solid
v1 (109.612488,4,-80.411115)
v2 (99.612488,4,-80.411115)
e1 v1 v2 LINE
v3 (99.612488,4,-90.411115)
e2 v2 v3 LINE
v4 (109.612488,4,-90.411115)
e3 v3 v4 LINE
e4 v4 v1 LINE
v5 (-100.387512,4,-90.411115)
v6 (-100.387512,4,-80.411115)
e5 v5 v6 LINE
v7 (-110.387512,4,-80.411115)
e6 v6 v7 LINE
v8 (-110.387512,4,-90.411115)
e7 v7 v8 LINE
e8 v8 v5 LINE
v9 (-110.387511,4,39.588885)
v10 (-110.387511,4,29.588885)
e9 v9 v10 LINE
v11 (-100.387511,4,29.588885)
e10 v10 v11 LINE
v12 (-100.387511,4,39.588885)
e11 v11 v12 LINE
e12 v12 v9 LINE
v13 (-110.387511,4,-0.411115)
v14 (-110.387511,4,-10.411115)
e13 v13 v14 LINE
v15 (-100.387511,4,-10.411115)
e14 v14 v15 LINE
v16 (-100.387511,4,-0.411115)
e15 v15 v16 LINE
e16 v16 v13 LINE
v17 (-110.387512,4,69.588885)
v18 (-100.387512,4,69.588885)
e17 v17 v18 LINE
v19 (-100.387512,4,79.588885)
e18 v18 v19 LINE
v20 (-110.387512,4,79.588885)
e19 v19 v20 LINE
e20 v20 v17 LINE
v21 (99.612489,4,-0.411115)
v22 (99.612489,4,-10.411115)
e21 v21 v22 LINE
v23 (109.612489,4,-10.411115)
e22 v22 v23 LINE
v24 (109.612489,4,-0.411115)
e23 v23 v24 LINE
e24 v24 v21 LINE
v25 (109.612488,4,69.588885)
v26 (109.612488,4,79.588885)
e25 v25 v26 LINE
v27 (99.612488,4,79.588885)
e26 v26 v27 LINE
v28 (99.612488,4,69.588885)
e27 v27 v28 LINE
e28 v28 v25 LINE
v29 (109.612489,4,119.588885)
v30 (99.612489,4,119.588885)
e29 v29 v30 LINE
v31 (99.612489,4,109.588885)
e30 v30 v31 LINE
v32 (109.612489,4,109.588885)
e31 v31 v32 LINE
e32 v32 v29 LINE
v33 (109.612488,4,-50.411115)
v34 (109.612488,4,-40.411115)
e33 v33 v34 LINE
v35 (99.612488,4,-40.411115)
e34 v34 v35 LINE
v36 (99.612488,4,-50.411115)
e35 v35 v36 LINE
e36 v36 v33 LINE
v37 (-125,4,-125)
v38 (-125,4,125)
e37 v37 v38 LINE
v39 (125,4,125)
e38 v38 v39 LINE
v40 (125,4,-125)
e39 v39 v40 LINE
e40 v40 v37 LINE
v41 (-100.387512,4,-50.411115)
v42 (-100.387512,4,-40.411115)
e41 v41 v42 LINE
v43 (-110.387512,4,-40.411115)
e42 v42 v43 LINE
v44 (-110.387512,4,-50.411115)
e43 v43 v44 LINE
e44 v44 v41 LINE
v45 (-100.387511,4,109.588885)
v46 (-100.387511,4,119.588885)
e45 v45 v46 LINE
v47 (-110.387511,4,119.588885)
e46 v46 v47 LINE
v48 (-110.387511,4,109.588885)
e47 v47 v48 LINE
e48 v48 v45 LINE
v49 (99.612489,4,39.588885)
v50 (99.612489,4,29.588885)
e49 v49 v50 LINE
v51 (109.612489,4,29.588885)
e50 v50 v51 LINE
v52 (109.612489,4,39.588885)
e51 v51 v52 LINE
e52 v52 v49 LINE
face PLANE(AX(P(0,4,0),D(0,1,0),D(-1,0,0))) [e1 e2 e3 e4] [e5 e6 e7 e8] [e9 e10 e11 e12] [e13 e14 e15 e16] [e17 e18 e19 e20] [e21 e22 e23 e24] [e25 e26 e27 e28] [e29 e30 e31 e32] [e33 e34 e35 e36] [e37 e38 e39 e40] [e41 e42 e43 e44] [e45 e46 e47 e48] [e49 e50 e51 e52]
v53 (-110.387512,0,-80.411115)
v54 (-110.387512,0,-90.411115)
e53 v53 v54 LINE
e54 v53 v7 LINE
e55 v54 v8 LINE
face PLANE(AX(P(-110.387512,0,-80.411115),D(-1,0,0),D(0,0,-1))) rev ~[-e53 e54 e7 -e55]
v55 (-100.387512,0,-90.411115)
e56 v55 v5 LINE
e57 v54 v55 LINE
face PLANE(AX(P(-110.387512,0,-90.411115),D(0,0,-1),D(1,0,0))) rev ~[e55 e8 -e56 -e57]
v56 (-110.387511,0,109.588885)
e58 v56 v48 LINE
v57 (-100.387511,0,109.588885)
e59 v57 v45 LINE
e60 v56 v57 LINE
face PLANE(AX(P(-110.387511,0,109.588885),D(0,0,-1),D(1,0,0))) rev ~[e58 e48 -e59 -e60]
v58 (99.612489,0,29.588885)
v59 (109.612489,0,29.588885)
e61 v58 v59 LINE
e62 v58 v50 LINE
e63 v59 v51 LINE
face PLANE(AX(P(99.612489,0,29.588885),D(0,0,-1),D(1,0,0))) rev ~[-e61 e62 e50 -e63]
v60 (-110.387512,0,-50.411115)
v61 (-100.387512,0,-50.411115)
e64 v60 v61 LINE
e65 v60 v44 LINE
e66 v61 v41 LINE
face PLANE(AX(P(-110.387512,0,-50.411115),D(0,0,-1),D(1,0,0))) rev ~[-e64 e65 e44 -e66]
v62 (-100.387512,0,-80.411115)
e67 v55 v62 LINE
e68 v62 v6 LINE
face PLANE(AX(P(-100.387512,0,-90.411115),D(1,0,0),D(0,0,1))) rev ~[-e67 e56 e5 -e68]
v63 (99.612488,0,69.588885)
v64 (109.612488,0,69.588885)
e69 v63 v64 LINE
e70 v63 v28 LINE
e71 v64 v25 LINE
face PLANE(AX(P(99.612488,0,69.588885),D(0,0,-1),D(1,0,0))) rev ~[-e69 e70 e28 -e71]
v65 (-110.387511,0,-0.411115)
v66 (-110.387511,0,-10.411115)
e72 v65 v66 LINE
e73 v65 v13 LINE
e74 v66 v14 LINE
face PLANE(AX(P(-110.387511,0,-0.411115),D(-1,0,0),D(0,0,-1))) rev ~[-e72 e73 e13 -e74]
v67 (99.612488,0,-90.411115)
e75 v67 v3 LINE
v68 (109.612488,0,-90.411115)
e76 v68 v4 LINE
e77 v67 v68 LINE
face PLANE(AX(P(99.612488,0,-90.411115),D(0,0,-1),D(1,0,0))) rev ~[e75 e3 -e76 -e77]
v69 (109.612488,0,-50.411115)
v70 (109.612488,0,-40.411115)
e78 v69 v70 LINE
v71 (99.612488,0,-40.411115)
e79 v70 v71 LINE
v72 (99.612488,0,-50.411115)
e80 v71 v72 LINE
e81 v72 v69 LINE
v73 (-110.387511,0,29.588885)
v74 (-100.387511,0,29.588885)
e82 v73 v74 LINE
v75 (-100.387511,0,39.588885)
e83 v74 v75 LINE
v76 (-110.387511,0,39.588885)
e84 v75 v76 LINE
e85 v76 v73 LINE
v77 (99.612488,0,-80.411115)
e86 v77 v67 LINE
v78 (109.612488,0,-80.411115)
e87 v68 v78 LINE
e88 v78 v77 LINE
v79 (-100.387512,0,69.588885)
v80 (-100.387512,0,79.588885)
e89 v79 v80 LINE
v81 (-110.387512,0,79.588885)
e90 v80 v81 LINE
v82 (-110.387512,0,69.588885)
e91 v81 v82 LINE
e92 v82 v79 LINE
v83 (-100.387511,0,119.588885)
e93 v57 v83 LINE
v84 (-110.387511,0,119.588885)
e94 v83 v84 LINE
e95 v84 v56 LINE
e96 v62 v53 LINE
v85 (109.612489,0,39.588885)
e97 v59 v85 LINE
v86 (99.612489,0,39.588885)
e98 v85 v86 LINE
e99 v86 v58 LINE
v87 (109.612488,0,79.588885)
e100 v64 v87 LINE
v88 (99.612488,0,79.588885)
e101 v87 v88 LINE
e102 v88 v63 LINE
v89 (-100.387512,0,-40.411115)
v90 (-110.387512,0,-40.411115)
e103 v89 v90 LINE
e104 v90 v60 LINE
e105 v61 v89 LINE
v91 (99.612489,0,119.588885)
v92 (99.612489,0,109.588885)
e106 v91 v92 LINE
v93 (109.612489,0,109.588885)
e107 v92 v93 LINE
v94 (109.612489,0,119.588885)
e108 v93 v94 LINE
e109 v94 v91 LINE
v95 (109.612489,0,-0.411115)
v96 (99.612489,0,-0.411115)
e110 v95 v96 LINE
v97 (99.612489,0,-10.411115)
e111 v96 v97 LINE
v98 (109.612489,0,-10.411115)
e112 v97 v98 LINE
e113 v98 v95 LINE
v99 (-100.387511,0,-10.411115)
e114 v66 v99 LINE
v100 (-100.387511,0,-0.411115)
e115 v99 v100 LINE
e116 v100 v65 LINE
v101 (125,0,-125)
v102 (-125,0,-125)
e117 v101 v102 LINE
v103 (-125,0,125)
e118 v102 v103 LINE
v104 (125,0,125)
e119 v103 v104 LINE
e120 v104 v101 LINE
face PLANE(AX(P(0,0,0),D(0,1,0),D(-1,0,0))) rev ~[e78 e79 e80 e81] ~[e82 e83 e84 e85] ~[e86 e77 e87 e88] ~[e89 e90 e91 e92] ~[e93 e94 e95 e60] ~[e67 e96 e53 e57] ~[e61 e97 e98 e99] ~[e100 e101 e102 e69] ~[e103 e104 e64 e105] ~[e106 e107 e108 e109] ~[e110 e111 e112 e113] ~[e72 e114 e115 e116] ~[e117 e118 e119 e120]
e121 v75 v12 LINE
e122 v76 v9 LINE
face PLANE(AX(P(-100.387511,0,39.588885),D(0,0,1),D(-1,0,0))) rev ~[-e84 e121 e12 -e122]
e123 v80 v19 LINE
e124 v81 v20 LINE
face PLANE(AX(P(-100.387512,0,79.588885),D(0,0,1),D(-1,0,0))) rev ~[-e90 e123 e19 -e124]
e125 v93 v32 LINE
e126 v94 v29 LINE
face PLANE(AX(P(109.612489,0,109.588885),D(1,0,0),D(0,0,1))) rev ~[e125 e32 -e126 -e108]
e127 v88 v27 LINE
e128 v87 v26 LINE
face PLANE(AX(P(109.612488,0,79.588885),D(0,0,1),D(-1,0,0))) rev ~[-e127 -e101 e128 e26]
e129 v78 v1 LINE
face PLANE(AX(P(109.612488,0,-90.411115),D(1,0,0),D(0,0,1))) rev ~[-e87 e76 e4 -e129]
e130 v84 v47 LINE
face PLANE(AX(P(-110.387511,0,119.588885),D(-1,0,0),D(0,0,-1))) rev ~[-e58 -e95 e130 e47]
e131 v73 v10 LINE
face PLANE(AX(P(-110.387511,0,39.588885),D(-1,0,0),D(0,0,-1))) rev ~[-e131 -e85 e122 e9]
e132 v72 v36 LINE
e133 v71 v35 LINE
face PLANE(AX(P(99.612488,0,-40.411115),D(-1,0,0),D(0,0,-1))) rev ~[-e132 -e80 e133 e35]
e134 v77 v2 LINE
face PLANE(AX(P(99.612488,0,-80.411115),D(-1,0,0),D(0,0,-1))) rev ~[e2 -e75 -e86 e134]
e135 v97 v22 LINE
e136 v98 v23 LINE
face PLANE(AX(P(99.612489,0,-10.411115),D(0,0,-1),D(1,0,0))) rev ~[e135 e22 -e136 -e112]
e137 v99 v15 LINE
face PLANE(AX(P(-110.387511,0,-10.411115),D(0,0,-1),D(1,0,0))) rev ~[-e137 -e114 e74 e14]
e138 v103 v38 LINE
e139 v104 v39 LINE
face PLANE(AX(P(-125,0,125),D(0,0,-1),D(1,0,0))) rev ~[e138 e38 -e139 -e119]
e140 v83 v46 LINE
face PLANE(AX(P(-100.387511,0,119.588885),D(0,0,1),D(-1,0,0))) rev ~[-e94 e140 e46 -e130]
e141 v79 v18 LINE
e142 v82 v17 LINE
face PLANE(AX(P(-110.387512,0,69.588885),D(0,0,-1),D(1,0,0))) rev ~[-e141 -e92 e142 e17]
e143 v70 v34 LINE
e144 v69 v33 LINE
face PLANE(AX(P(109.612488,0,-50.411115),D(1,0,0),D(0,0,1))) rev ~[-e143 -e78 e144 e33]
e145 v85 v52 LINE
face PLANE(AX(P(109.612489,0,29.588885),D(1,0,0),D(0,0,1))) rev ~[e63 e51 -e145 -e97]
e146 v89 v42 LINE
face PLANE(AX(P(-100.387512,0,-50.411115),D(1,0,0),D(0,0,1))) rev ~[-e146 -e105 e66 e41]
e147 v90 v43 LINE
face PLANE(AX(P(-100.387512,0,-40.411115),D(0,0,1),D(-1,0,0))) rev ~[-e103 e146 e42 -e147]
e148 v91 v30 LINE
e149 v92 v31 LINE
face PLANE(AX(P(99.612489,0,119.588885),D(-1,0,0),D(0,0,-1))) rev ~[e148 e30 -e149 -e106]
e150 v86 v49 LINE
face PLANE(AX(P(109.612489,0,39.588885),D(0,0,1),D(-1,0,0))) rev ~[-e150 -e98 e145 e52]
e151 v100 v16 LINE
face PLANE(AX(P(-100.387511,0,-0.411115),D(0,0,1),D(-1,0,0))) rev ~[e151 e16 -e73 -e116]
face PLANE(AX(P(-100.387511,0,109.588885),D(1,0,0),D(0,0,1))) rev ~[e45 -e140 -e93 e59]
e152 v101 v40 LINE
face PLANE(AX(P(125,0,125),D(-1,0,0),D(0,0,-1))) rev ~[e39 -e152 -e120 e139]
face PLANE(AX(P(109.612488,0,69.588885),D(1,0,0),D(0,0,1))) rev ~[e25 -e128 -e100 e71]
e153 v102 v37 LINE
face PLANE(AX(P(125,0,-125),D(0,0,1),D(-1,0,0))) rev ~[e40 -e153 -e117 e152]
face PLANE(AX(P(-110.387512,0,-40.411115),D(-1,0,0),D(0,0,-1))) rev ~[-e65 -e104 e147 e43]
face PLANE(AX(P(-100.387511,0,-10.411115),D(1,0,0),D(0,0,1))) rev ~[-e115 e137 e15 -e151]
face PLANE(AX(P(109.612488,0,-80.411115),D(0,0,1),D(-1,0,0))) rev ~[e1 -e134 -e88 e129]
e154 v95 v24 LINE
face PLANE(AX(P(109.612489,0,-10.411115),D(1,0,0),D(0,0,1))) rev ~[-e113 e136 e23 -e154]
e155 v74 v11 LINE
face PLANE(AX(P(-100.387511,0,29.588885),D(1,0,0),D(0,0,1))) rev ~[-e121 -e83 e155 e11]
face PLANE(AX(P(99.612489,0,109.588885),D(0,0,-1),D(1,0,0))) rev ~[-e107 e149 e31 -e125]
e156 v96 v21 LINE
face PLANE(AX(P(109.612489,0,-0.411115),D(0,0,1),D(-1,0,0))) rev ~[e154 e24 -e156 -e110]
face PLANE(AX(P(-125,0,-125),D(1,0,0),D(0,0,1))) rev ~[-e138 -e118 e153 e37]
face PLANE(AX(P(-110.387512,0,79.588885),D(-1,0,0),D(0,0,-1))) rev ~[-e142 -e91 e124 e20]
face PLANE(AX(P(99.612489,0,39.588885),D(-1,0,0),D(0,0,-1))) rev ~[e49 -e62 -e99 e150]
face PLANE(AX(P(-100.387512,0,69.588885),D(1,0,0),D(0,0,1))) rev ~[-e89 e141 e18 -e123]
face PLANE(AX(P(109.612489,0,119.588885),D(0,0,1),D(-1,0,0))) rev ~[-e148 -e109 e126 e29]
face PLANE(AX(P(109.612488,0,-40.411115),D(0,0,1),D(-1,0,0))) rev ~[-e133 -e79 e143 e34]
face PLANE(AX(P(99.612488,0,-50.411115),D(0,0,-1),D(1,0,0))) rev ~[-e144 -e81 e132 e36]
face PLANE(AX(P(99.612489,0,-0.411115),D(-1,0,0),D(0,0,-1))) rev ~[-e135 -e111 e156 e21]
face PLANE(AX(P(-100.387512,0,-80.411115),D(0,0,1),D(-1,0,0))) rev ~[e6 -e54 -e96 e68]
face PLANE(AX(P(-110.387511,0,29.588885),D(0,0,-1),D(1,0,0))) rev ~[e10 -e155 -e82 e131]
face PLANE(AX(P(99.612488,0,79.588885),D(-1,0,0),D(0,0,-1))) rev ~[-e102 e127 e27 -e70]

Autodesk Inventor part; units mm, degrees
ref_plane "YZ Plane" through (0, 0, 0) normal (1, 0, 0) x (0, 1, 0)
ref_plane "XZ Plane" through (0, 0, 0) normal (0, 1, 0) x (-1, 0, 0)
ref_plane "XY Plane" through (0, 0, 0) normal (0, 0, 1) x (1, 0, 0)
sketch "Эскиз1" plane through (0, 0, 0) normal (0, 1, 0) x (-1, 0, 0)
  line L0 (125, 125) -> (-125, 125)
  line L1 (-125, 125) -> (-125, -125)
  line L2 (-125, -125) -> (125, -125)
  line L3 (125, -125) -> (125, 125)
  line L4 (125, 125) -> (-125, -125) construction
  line L5 (-125, 125) -> (125, -125) construction
  point P0 (0, 0)
  dimension "d0" = 250
  dimension "d1" = 250
extrude "Выдавливание1" add sketch "Эскиз1" along normal blind 4
sketch "Эскиз2" plane through (0, 0, 0) normal (0, -1, 0) x (1, 0, 0)
  line L0 (-110.387511, 109.588885) -> (-110.387511, 119.588885)
  line L1 (-100.387511, 109.588885) -> (-110.387511, 109.588885)
  line L2 (-100.387511, 119.588885) -> (-100.387511, 109.588885)
  line L3 (-110.387511, 119.588885) -> (-100.387511, 119.588885)
  line L4 (-110.387511, 29.588885) -> (-110.387511, 39.588885)
  line L5 (-100.387511, 29.588885) -> (-110.387511, 29.588885)
  line L6 (-100.387511, 39.588885) -> (-100.387511, 29.588885)
  line L7 (-110.387511, 39.588885) -> (-100.387511, 39.588885)
  line L8 (-110.387511, -10.411115) -> (-110.387511, -0.411115)
  line L9 (-100.387511, -10.411115) -> (-110.387511, -10.411115)
  line L10 (-100.387511, -0.411115) -> (-100.387511, -10.411115)
  line L11 (-110.387511, -0.411115) -> (-100.387511, -0.411115)
  line L12 (125, 125) -> (125, -125)
  line L13 (-125, 125) -> (125, 125)
  line L14 (-125, -125) -> (-125, 125)
  line L15 (125, -125) -> (-125, -125)
  line L16 (109.612489, 109.588885) -> (109.612489, 119.588885)
  line L17 (109.612489, 119.588885) -> (99.612489, 119.588885)
  line L18 (99.612489, 119.588885) -> (99.612489, 109.588885)
  line L19 (99.612489, 109.588885) -> (109.612489, 109.588885)
  line L20 (109.612489, 29.588885) -> (109.612489, 39.588885)
  line L21 (109.612489, 39.588885) -> (99.612489, 39.588885)
  line L22 (99.612489, 39.588885) -> (99.612489, 29.588885)
  line L23 (99.612489, 29.588885) -> (109.612489, 29.588885)
  line L24 (109.612489, -10.411115) -> (109.612489, -0.411115)
  line L25 (109.612489, -0.411115) -> (99.612489, -0.411115)
  line L26 (99.612489, -0.411115) -> (99.612489, -10.411115)
  line L27 (99.612489, -10.411115) -> (109.612489, -10.411115)
  line L28 (109.612488, -50.411115) -> (109.612488, -40.411115)
  line L29 (109.612488, -40.411115) -> (99.612488, -40.411115)
  line L30 (99.612488, -40.411115) -> (99.612488, -50.411115)
  line L31 (99.612488, -50.411115) -> (109.612488, -50.411115)
  line L32 (109.612488, -90.411115) -> (109.612488, -80.411115)
  line L33 (109.612488, -80.411115) -> (99.612488, -80.411115)
  line L34 (99.612488, -80.411115) -> (99.612488, -90.411115)
  line L35 (99.612488, -90.411115) -> (109.612488, -90.411115)
  line L36 (-100.387512, -80.411115) -> (-100.387512, -90.411115)
  line L37 (-110.387512, -81.025031) -> (-100.387512, -81.025031)
  line L38 (-110.387512, -90.411115) -> (-110.387512, -80.411115)
  line L39 (-100.387512, -110) -> (-110.387512, -110)
  line L40 (-100.387512, -40.411115) -> (-100.387512, -50.411115)
  line L41 (-100.387512, -50.411115) -> (-110.387512, -50.411115)
  line L42 (-110.387512, -50.411115) -> (-110.387512, -40.411115)
  line L43 (-110.387512, -40.411115) -> (-100.387512, -40.411115)
  line L44 (-100.387512, 74.588885) -> (-100.387512, 69.588885)
  line L45 (-100.387512, 79.588885) -> (-100.387512, 74.588885)
  line L46 (-110.387512, 79.588885) -> (-100.387512, 79.588885)
  line L47 (-110.387512, 74.588885) -> (-110.387512, 79.588885)
  line L48 (-110.387512, 69.588885) -> (-110.387512, 74.588885)
  line L49 (-100.387512, 69.588885) -> (-110.387512, 69.588885)
  line L50 (109.612488, 79.588885) -> (99.612488, 79.588885)
  line L51 (99.612488, 69.588885) -> (109.612488, 69.588885)
  line L52 (99.612488, 74.588885) -> (99.612488, 69.588885)
  line L53 (109.612488, 69.588885) -> (109.612488, 74.588885)
  line L54 (109.612488, 74.588885) -> (109.612488, 79.588885)
  line L55 (99.612488, 79.588885) -> (99.612488, 74.588885)
  circle A0 centre (104.612488, -65.411115) radius 2
  circle A1 centre (104.612488, -25.411115) radius 2
  circle A2 centre (104.612488, 14.588885) radius 2
  circle A3 centre (104.612488, 54.588885) radius 2
  circle A4 centre (104.612488, 94.588885) radius 2
  circle A5 centre (-105.387512, 94.588885) radius 2
  circle A6 centre (-105.387512, 54.588885) radius 2
  circle A7 centre (-105.387512, 14.588885) radius 2
  circle A8 centre (-105.387512, -25.411115) radius 2
  circle A9 centre (-105.387512, -65.411115) radius 2
  point P0 (0, 0)
sketch "Эскиз2 outline for Выдавливание2" plane through (0, 0, 0) normal (0, -1, 0) x (1, 0, 0)
  line L0 (-110.387511, -10.411115) -> (-100.387511, -10.411115)
  line L1 (-110.387511, -0.411115) -> (-110.387511, -10.411115)
  line L2 (-100.387511, -0.411115) -> (-110.387511, -0.411115)
  line L3 (-100.387511, -10.411115) -> (-100.387511, -0.411115)
  line L4 (-110.387511, 29.588885) -> (-100.387511, 29.588885)
  line L5 (-110.387511, 39.588885) -> (-110.387511, 29.588885)
  line L6 (-100.387511, 39.588885) -> (-110.387511, 39.588885)
  line L7 (-100.387511, 29.588885) -> (-100.387511, 39.588885)
  line L8 (-110.387511, 109.588885) -> (-100.387511, 109.588885)
  line L9 (-110.387511, 119.588885) -> (-110.387511, 109.588885)
  line L10 (-100.387511, 119.588885) -> (-110.387511, 119.588885)
  line L11 (-100.387511, 109.588885) -> (-100.387511, 119.588885)
  line L12 (109.612488, -90.411115) -> (109.612488, -80.411115)
  line L13 (99.612488, -90.411115) -> (109.612488, -90.411115)
  line L14 (99.612488, -80.411115) -> (99.612488, -90.411115)
  line L15 (109.612488, -80.411115) -> (99.612488, -80.411115)
  line L16 (109.612488, -50.411115) -> (109.612488, -40.411115)
  line L17 (99.612488, -50.411115) -> (109.612488, -50.411115)
  line L18 (99.612488, -40.411115) -> (99.612488, -50.411115)
  line L19 (109.612488, -40.411115) -> (99.612488, -40.411115)
  line L20 (109.612489, -10.411115) -> (109.612489, -0.411115)
  line L21 (99.612489, -10.411115) -> (109.612489, -10.411115)
  line L22 (99.612489, -0.411115) -> (99.612489, -10.411115)
  line L23 (109.612489, -0.411115) -> (99.612489, -0.411115)
  line L24 (109.612489, 29.588885) -> (109.612489, 39.588885)
  line L25 (99.612489, 29.588885) -> (109.612489, 29.588885)
  line L26 (99.612489, 39.588885) -> (99.612489, 29.588885)
  line L27 (109.612489, 39.588885) -> (99.612489, 39.588885)
  line L28 (109.612489, 109.588885) -> (109.612489, 119.588885)
  line L29 (99.612489, 109.588885) -> (109.612489, 109.588885)
  line L30 (99.612489, 119.588885) -> (99.612489, 109.588885)
  line L31 (109.612489, 119.588885) -> (99.612489, 119.588885)
  line L32 (-100.387512, -80.411115) -> (-110.387512, -80.411115)
  line L33 (-100.387512, -90.411115) -> (-100.387512, -80.411115)
  line L34 (-110.387512, -90.411115) -> (-100.387512, -90.411115)
  line L35 (-110.387512, -80.411115) -> (-110.387512, -90.411115)
  line L36 (-100.387512, -40.411115) -> (-110.387512, -40.411115)
  line L37 (-100.387512, -50.411115) -> (-100.387512, -40.411115)
  line L38 (-110.387512, -50.411115) -> (-100.387512, -50.411115)
  line L39 (-110.387512, -40.411115) -> (-110.387512, -50.411115)
  line L40 (-100.387512, 69.588885) -> (-100.387512, 79.588885)
  line L41 (-100.387512, 79.588885) -> (-110.387512, 79.588885)
  line L42 (-110.387512, 79.588885) -> (-110.387512, 69.588885)
  line L43 (-110.387512, 69.588885) -> (-100.387512, 69.588885)
  line L44 (109.612488, 79.588885) -> (99.612488, 79.588885)
  line L45 (99.612488, 79.588885) -> (99.612488, 69.588885)
  line L46 (99.612488, 69.588885) -> (109.612488, 69.588885)
  line L47 (109.612488, 69.588885) -> (109.612488, 79.588885)
extrude "Выдавливание2" cut sketch "Эскиз2 outline for Выдавливание2" against normal up to surface (4 mm away)
properties part number "Платформа подъёмника"
